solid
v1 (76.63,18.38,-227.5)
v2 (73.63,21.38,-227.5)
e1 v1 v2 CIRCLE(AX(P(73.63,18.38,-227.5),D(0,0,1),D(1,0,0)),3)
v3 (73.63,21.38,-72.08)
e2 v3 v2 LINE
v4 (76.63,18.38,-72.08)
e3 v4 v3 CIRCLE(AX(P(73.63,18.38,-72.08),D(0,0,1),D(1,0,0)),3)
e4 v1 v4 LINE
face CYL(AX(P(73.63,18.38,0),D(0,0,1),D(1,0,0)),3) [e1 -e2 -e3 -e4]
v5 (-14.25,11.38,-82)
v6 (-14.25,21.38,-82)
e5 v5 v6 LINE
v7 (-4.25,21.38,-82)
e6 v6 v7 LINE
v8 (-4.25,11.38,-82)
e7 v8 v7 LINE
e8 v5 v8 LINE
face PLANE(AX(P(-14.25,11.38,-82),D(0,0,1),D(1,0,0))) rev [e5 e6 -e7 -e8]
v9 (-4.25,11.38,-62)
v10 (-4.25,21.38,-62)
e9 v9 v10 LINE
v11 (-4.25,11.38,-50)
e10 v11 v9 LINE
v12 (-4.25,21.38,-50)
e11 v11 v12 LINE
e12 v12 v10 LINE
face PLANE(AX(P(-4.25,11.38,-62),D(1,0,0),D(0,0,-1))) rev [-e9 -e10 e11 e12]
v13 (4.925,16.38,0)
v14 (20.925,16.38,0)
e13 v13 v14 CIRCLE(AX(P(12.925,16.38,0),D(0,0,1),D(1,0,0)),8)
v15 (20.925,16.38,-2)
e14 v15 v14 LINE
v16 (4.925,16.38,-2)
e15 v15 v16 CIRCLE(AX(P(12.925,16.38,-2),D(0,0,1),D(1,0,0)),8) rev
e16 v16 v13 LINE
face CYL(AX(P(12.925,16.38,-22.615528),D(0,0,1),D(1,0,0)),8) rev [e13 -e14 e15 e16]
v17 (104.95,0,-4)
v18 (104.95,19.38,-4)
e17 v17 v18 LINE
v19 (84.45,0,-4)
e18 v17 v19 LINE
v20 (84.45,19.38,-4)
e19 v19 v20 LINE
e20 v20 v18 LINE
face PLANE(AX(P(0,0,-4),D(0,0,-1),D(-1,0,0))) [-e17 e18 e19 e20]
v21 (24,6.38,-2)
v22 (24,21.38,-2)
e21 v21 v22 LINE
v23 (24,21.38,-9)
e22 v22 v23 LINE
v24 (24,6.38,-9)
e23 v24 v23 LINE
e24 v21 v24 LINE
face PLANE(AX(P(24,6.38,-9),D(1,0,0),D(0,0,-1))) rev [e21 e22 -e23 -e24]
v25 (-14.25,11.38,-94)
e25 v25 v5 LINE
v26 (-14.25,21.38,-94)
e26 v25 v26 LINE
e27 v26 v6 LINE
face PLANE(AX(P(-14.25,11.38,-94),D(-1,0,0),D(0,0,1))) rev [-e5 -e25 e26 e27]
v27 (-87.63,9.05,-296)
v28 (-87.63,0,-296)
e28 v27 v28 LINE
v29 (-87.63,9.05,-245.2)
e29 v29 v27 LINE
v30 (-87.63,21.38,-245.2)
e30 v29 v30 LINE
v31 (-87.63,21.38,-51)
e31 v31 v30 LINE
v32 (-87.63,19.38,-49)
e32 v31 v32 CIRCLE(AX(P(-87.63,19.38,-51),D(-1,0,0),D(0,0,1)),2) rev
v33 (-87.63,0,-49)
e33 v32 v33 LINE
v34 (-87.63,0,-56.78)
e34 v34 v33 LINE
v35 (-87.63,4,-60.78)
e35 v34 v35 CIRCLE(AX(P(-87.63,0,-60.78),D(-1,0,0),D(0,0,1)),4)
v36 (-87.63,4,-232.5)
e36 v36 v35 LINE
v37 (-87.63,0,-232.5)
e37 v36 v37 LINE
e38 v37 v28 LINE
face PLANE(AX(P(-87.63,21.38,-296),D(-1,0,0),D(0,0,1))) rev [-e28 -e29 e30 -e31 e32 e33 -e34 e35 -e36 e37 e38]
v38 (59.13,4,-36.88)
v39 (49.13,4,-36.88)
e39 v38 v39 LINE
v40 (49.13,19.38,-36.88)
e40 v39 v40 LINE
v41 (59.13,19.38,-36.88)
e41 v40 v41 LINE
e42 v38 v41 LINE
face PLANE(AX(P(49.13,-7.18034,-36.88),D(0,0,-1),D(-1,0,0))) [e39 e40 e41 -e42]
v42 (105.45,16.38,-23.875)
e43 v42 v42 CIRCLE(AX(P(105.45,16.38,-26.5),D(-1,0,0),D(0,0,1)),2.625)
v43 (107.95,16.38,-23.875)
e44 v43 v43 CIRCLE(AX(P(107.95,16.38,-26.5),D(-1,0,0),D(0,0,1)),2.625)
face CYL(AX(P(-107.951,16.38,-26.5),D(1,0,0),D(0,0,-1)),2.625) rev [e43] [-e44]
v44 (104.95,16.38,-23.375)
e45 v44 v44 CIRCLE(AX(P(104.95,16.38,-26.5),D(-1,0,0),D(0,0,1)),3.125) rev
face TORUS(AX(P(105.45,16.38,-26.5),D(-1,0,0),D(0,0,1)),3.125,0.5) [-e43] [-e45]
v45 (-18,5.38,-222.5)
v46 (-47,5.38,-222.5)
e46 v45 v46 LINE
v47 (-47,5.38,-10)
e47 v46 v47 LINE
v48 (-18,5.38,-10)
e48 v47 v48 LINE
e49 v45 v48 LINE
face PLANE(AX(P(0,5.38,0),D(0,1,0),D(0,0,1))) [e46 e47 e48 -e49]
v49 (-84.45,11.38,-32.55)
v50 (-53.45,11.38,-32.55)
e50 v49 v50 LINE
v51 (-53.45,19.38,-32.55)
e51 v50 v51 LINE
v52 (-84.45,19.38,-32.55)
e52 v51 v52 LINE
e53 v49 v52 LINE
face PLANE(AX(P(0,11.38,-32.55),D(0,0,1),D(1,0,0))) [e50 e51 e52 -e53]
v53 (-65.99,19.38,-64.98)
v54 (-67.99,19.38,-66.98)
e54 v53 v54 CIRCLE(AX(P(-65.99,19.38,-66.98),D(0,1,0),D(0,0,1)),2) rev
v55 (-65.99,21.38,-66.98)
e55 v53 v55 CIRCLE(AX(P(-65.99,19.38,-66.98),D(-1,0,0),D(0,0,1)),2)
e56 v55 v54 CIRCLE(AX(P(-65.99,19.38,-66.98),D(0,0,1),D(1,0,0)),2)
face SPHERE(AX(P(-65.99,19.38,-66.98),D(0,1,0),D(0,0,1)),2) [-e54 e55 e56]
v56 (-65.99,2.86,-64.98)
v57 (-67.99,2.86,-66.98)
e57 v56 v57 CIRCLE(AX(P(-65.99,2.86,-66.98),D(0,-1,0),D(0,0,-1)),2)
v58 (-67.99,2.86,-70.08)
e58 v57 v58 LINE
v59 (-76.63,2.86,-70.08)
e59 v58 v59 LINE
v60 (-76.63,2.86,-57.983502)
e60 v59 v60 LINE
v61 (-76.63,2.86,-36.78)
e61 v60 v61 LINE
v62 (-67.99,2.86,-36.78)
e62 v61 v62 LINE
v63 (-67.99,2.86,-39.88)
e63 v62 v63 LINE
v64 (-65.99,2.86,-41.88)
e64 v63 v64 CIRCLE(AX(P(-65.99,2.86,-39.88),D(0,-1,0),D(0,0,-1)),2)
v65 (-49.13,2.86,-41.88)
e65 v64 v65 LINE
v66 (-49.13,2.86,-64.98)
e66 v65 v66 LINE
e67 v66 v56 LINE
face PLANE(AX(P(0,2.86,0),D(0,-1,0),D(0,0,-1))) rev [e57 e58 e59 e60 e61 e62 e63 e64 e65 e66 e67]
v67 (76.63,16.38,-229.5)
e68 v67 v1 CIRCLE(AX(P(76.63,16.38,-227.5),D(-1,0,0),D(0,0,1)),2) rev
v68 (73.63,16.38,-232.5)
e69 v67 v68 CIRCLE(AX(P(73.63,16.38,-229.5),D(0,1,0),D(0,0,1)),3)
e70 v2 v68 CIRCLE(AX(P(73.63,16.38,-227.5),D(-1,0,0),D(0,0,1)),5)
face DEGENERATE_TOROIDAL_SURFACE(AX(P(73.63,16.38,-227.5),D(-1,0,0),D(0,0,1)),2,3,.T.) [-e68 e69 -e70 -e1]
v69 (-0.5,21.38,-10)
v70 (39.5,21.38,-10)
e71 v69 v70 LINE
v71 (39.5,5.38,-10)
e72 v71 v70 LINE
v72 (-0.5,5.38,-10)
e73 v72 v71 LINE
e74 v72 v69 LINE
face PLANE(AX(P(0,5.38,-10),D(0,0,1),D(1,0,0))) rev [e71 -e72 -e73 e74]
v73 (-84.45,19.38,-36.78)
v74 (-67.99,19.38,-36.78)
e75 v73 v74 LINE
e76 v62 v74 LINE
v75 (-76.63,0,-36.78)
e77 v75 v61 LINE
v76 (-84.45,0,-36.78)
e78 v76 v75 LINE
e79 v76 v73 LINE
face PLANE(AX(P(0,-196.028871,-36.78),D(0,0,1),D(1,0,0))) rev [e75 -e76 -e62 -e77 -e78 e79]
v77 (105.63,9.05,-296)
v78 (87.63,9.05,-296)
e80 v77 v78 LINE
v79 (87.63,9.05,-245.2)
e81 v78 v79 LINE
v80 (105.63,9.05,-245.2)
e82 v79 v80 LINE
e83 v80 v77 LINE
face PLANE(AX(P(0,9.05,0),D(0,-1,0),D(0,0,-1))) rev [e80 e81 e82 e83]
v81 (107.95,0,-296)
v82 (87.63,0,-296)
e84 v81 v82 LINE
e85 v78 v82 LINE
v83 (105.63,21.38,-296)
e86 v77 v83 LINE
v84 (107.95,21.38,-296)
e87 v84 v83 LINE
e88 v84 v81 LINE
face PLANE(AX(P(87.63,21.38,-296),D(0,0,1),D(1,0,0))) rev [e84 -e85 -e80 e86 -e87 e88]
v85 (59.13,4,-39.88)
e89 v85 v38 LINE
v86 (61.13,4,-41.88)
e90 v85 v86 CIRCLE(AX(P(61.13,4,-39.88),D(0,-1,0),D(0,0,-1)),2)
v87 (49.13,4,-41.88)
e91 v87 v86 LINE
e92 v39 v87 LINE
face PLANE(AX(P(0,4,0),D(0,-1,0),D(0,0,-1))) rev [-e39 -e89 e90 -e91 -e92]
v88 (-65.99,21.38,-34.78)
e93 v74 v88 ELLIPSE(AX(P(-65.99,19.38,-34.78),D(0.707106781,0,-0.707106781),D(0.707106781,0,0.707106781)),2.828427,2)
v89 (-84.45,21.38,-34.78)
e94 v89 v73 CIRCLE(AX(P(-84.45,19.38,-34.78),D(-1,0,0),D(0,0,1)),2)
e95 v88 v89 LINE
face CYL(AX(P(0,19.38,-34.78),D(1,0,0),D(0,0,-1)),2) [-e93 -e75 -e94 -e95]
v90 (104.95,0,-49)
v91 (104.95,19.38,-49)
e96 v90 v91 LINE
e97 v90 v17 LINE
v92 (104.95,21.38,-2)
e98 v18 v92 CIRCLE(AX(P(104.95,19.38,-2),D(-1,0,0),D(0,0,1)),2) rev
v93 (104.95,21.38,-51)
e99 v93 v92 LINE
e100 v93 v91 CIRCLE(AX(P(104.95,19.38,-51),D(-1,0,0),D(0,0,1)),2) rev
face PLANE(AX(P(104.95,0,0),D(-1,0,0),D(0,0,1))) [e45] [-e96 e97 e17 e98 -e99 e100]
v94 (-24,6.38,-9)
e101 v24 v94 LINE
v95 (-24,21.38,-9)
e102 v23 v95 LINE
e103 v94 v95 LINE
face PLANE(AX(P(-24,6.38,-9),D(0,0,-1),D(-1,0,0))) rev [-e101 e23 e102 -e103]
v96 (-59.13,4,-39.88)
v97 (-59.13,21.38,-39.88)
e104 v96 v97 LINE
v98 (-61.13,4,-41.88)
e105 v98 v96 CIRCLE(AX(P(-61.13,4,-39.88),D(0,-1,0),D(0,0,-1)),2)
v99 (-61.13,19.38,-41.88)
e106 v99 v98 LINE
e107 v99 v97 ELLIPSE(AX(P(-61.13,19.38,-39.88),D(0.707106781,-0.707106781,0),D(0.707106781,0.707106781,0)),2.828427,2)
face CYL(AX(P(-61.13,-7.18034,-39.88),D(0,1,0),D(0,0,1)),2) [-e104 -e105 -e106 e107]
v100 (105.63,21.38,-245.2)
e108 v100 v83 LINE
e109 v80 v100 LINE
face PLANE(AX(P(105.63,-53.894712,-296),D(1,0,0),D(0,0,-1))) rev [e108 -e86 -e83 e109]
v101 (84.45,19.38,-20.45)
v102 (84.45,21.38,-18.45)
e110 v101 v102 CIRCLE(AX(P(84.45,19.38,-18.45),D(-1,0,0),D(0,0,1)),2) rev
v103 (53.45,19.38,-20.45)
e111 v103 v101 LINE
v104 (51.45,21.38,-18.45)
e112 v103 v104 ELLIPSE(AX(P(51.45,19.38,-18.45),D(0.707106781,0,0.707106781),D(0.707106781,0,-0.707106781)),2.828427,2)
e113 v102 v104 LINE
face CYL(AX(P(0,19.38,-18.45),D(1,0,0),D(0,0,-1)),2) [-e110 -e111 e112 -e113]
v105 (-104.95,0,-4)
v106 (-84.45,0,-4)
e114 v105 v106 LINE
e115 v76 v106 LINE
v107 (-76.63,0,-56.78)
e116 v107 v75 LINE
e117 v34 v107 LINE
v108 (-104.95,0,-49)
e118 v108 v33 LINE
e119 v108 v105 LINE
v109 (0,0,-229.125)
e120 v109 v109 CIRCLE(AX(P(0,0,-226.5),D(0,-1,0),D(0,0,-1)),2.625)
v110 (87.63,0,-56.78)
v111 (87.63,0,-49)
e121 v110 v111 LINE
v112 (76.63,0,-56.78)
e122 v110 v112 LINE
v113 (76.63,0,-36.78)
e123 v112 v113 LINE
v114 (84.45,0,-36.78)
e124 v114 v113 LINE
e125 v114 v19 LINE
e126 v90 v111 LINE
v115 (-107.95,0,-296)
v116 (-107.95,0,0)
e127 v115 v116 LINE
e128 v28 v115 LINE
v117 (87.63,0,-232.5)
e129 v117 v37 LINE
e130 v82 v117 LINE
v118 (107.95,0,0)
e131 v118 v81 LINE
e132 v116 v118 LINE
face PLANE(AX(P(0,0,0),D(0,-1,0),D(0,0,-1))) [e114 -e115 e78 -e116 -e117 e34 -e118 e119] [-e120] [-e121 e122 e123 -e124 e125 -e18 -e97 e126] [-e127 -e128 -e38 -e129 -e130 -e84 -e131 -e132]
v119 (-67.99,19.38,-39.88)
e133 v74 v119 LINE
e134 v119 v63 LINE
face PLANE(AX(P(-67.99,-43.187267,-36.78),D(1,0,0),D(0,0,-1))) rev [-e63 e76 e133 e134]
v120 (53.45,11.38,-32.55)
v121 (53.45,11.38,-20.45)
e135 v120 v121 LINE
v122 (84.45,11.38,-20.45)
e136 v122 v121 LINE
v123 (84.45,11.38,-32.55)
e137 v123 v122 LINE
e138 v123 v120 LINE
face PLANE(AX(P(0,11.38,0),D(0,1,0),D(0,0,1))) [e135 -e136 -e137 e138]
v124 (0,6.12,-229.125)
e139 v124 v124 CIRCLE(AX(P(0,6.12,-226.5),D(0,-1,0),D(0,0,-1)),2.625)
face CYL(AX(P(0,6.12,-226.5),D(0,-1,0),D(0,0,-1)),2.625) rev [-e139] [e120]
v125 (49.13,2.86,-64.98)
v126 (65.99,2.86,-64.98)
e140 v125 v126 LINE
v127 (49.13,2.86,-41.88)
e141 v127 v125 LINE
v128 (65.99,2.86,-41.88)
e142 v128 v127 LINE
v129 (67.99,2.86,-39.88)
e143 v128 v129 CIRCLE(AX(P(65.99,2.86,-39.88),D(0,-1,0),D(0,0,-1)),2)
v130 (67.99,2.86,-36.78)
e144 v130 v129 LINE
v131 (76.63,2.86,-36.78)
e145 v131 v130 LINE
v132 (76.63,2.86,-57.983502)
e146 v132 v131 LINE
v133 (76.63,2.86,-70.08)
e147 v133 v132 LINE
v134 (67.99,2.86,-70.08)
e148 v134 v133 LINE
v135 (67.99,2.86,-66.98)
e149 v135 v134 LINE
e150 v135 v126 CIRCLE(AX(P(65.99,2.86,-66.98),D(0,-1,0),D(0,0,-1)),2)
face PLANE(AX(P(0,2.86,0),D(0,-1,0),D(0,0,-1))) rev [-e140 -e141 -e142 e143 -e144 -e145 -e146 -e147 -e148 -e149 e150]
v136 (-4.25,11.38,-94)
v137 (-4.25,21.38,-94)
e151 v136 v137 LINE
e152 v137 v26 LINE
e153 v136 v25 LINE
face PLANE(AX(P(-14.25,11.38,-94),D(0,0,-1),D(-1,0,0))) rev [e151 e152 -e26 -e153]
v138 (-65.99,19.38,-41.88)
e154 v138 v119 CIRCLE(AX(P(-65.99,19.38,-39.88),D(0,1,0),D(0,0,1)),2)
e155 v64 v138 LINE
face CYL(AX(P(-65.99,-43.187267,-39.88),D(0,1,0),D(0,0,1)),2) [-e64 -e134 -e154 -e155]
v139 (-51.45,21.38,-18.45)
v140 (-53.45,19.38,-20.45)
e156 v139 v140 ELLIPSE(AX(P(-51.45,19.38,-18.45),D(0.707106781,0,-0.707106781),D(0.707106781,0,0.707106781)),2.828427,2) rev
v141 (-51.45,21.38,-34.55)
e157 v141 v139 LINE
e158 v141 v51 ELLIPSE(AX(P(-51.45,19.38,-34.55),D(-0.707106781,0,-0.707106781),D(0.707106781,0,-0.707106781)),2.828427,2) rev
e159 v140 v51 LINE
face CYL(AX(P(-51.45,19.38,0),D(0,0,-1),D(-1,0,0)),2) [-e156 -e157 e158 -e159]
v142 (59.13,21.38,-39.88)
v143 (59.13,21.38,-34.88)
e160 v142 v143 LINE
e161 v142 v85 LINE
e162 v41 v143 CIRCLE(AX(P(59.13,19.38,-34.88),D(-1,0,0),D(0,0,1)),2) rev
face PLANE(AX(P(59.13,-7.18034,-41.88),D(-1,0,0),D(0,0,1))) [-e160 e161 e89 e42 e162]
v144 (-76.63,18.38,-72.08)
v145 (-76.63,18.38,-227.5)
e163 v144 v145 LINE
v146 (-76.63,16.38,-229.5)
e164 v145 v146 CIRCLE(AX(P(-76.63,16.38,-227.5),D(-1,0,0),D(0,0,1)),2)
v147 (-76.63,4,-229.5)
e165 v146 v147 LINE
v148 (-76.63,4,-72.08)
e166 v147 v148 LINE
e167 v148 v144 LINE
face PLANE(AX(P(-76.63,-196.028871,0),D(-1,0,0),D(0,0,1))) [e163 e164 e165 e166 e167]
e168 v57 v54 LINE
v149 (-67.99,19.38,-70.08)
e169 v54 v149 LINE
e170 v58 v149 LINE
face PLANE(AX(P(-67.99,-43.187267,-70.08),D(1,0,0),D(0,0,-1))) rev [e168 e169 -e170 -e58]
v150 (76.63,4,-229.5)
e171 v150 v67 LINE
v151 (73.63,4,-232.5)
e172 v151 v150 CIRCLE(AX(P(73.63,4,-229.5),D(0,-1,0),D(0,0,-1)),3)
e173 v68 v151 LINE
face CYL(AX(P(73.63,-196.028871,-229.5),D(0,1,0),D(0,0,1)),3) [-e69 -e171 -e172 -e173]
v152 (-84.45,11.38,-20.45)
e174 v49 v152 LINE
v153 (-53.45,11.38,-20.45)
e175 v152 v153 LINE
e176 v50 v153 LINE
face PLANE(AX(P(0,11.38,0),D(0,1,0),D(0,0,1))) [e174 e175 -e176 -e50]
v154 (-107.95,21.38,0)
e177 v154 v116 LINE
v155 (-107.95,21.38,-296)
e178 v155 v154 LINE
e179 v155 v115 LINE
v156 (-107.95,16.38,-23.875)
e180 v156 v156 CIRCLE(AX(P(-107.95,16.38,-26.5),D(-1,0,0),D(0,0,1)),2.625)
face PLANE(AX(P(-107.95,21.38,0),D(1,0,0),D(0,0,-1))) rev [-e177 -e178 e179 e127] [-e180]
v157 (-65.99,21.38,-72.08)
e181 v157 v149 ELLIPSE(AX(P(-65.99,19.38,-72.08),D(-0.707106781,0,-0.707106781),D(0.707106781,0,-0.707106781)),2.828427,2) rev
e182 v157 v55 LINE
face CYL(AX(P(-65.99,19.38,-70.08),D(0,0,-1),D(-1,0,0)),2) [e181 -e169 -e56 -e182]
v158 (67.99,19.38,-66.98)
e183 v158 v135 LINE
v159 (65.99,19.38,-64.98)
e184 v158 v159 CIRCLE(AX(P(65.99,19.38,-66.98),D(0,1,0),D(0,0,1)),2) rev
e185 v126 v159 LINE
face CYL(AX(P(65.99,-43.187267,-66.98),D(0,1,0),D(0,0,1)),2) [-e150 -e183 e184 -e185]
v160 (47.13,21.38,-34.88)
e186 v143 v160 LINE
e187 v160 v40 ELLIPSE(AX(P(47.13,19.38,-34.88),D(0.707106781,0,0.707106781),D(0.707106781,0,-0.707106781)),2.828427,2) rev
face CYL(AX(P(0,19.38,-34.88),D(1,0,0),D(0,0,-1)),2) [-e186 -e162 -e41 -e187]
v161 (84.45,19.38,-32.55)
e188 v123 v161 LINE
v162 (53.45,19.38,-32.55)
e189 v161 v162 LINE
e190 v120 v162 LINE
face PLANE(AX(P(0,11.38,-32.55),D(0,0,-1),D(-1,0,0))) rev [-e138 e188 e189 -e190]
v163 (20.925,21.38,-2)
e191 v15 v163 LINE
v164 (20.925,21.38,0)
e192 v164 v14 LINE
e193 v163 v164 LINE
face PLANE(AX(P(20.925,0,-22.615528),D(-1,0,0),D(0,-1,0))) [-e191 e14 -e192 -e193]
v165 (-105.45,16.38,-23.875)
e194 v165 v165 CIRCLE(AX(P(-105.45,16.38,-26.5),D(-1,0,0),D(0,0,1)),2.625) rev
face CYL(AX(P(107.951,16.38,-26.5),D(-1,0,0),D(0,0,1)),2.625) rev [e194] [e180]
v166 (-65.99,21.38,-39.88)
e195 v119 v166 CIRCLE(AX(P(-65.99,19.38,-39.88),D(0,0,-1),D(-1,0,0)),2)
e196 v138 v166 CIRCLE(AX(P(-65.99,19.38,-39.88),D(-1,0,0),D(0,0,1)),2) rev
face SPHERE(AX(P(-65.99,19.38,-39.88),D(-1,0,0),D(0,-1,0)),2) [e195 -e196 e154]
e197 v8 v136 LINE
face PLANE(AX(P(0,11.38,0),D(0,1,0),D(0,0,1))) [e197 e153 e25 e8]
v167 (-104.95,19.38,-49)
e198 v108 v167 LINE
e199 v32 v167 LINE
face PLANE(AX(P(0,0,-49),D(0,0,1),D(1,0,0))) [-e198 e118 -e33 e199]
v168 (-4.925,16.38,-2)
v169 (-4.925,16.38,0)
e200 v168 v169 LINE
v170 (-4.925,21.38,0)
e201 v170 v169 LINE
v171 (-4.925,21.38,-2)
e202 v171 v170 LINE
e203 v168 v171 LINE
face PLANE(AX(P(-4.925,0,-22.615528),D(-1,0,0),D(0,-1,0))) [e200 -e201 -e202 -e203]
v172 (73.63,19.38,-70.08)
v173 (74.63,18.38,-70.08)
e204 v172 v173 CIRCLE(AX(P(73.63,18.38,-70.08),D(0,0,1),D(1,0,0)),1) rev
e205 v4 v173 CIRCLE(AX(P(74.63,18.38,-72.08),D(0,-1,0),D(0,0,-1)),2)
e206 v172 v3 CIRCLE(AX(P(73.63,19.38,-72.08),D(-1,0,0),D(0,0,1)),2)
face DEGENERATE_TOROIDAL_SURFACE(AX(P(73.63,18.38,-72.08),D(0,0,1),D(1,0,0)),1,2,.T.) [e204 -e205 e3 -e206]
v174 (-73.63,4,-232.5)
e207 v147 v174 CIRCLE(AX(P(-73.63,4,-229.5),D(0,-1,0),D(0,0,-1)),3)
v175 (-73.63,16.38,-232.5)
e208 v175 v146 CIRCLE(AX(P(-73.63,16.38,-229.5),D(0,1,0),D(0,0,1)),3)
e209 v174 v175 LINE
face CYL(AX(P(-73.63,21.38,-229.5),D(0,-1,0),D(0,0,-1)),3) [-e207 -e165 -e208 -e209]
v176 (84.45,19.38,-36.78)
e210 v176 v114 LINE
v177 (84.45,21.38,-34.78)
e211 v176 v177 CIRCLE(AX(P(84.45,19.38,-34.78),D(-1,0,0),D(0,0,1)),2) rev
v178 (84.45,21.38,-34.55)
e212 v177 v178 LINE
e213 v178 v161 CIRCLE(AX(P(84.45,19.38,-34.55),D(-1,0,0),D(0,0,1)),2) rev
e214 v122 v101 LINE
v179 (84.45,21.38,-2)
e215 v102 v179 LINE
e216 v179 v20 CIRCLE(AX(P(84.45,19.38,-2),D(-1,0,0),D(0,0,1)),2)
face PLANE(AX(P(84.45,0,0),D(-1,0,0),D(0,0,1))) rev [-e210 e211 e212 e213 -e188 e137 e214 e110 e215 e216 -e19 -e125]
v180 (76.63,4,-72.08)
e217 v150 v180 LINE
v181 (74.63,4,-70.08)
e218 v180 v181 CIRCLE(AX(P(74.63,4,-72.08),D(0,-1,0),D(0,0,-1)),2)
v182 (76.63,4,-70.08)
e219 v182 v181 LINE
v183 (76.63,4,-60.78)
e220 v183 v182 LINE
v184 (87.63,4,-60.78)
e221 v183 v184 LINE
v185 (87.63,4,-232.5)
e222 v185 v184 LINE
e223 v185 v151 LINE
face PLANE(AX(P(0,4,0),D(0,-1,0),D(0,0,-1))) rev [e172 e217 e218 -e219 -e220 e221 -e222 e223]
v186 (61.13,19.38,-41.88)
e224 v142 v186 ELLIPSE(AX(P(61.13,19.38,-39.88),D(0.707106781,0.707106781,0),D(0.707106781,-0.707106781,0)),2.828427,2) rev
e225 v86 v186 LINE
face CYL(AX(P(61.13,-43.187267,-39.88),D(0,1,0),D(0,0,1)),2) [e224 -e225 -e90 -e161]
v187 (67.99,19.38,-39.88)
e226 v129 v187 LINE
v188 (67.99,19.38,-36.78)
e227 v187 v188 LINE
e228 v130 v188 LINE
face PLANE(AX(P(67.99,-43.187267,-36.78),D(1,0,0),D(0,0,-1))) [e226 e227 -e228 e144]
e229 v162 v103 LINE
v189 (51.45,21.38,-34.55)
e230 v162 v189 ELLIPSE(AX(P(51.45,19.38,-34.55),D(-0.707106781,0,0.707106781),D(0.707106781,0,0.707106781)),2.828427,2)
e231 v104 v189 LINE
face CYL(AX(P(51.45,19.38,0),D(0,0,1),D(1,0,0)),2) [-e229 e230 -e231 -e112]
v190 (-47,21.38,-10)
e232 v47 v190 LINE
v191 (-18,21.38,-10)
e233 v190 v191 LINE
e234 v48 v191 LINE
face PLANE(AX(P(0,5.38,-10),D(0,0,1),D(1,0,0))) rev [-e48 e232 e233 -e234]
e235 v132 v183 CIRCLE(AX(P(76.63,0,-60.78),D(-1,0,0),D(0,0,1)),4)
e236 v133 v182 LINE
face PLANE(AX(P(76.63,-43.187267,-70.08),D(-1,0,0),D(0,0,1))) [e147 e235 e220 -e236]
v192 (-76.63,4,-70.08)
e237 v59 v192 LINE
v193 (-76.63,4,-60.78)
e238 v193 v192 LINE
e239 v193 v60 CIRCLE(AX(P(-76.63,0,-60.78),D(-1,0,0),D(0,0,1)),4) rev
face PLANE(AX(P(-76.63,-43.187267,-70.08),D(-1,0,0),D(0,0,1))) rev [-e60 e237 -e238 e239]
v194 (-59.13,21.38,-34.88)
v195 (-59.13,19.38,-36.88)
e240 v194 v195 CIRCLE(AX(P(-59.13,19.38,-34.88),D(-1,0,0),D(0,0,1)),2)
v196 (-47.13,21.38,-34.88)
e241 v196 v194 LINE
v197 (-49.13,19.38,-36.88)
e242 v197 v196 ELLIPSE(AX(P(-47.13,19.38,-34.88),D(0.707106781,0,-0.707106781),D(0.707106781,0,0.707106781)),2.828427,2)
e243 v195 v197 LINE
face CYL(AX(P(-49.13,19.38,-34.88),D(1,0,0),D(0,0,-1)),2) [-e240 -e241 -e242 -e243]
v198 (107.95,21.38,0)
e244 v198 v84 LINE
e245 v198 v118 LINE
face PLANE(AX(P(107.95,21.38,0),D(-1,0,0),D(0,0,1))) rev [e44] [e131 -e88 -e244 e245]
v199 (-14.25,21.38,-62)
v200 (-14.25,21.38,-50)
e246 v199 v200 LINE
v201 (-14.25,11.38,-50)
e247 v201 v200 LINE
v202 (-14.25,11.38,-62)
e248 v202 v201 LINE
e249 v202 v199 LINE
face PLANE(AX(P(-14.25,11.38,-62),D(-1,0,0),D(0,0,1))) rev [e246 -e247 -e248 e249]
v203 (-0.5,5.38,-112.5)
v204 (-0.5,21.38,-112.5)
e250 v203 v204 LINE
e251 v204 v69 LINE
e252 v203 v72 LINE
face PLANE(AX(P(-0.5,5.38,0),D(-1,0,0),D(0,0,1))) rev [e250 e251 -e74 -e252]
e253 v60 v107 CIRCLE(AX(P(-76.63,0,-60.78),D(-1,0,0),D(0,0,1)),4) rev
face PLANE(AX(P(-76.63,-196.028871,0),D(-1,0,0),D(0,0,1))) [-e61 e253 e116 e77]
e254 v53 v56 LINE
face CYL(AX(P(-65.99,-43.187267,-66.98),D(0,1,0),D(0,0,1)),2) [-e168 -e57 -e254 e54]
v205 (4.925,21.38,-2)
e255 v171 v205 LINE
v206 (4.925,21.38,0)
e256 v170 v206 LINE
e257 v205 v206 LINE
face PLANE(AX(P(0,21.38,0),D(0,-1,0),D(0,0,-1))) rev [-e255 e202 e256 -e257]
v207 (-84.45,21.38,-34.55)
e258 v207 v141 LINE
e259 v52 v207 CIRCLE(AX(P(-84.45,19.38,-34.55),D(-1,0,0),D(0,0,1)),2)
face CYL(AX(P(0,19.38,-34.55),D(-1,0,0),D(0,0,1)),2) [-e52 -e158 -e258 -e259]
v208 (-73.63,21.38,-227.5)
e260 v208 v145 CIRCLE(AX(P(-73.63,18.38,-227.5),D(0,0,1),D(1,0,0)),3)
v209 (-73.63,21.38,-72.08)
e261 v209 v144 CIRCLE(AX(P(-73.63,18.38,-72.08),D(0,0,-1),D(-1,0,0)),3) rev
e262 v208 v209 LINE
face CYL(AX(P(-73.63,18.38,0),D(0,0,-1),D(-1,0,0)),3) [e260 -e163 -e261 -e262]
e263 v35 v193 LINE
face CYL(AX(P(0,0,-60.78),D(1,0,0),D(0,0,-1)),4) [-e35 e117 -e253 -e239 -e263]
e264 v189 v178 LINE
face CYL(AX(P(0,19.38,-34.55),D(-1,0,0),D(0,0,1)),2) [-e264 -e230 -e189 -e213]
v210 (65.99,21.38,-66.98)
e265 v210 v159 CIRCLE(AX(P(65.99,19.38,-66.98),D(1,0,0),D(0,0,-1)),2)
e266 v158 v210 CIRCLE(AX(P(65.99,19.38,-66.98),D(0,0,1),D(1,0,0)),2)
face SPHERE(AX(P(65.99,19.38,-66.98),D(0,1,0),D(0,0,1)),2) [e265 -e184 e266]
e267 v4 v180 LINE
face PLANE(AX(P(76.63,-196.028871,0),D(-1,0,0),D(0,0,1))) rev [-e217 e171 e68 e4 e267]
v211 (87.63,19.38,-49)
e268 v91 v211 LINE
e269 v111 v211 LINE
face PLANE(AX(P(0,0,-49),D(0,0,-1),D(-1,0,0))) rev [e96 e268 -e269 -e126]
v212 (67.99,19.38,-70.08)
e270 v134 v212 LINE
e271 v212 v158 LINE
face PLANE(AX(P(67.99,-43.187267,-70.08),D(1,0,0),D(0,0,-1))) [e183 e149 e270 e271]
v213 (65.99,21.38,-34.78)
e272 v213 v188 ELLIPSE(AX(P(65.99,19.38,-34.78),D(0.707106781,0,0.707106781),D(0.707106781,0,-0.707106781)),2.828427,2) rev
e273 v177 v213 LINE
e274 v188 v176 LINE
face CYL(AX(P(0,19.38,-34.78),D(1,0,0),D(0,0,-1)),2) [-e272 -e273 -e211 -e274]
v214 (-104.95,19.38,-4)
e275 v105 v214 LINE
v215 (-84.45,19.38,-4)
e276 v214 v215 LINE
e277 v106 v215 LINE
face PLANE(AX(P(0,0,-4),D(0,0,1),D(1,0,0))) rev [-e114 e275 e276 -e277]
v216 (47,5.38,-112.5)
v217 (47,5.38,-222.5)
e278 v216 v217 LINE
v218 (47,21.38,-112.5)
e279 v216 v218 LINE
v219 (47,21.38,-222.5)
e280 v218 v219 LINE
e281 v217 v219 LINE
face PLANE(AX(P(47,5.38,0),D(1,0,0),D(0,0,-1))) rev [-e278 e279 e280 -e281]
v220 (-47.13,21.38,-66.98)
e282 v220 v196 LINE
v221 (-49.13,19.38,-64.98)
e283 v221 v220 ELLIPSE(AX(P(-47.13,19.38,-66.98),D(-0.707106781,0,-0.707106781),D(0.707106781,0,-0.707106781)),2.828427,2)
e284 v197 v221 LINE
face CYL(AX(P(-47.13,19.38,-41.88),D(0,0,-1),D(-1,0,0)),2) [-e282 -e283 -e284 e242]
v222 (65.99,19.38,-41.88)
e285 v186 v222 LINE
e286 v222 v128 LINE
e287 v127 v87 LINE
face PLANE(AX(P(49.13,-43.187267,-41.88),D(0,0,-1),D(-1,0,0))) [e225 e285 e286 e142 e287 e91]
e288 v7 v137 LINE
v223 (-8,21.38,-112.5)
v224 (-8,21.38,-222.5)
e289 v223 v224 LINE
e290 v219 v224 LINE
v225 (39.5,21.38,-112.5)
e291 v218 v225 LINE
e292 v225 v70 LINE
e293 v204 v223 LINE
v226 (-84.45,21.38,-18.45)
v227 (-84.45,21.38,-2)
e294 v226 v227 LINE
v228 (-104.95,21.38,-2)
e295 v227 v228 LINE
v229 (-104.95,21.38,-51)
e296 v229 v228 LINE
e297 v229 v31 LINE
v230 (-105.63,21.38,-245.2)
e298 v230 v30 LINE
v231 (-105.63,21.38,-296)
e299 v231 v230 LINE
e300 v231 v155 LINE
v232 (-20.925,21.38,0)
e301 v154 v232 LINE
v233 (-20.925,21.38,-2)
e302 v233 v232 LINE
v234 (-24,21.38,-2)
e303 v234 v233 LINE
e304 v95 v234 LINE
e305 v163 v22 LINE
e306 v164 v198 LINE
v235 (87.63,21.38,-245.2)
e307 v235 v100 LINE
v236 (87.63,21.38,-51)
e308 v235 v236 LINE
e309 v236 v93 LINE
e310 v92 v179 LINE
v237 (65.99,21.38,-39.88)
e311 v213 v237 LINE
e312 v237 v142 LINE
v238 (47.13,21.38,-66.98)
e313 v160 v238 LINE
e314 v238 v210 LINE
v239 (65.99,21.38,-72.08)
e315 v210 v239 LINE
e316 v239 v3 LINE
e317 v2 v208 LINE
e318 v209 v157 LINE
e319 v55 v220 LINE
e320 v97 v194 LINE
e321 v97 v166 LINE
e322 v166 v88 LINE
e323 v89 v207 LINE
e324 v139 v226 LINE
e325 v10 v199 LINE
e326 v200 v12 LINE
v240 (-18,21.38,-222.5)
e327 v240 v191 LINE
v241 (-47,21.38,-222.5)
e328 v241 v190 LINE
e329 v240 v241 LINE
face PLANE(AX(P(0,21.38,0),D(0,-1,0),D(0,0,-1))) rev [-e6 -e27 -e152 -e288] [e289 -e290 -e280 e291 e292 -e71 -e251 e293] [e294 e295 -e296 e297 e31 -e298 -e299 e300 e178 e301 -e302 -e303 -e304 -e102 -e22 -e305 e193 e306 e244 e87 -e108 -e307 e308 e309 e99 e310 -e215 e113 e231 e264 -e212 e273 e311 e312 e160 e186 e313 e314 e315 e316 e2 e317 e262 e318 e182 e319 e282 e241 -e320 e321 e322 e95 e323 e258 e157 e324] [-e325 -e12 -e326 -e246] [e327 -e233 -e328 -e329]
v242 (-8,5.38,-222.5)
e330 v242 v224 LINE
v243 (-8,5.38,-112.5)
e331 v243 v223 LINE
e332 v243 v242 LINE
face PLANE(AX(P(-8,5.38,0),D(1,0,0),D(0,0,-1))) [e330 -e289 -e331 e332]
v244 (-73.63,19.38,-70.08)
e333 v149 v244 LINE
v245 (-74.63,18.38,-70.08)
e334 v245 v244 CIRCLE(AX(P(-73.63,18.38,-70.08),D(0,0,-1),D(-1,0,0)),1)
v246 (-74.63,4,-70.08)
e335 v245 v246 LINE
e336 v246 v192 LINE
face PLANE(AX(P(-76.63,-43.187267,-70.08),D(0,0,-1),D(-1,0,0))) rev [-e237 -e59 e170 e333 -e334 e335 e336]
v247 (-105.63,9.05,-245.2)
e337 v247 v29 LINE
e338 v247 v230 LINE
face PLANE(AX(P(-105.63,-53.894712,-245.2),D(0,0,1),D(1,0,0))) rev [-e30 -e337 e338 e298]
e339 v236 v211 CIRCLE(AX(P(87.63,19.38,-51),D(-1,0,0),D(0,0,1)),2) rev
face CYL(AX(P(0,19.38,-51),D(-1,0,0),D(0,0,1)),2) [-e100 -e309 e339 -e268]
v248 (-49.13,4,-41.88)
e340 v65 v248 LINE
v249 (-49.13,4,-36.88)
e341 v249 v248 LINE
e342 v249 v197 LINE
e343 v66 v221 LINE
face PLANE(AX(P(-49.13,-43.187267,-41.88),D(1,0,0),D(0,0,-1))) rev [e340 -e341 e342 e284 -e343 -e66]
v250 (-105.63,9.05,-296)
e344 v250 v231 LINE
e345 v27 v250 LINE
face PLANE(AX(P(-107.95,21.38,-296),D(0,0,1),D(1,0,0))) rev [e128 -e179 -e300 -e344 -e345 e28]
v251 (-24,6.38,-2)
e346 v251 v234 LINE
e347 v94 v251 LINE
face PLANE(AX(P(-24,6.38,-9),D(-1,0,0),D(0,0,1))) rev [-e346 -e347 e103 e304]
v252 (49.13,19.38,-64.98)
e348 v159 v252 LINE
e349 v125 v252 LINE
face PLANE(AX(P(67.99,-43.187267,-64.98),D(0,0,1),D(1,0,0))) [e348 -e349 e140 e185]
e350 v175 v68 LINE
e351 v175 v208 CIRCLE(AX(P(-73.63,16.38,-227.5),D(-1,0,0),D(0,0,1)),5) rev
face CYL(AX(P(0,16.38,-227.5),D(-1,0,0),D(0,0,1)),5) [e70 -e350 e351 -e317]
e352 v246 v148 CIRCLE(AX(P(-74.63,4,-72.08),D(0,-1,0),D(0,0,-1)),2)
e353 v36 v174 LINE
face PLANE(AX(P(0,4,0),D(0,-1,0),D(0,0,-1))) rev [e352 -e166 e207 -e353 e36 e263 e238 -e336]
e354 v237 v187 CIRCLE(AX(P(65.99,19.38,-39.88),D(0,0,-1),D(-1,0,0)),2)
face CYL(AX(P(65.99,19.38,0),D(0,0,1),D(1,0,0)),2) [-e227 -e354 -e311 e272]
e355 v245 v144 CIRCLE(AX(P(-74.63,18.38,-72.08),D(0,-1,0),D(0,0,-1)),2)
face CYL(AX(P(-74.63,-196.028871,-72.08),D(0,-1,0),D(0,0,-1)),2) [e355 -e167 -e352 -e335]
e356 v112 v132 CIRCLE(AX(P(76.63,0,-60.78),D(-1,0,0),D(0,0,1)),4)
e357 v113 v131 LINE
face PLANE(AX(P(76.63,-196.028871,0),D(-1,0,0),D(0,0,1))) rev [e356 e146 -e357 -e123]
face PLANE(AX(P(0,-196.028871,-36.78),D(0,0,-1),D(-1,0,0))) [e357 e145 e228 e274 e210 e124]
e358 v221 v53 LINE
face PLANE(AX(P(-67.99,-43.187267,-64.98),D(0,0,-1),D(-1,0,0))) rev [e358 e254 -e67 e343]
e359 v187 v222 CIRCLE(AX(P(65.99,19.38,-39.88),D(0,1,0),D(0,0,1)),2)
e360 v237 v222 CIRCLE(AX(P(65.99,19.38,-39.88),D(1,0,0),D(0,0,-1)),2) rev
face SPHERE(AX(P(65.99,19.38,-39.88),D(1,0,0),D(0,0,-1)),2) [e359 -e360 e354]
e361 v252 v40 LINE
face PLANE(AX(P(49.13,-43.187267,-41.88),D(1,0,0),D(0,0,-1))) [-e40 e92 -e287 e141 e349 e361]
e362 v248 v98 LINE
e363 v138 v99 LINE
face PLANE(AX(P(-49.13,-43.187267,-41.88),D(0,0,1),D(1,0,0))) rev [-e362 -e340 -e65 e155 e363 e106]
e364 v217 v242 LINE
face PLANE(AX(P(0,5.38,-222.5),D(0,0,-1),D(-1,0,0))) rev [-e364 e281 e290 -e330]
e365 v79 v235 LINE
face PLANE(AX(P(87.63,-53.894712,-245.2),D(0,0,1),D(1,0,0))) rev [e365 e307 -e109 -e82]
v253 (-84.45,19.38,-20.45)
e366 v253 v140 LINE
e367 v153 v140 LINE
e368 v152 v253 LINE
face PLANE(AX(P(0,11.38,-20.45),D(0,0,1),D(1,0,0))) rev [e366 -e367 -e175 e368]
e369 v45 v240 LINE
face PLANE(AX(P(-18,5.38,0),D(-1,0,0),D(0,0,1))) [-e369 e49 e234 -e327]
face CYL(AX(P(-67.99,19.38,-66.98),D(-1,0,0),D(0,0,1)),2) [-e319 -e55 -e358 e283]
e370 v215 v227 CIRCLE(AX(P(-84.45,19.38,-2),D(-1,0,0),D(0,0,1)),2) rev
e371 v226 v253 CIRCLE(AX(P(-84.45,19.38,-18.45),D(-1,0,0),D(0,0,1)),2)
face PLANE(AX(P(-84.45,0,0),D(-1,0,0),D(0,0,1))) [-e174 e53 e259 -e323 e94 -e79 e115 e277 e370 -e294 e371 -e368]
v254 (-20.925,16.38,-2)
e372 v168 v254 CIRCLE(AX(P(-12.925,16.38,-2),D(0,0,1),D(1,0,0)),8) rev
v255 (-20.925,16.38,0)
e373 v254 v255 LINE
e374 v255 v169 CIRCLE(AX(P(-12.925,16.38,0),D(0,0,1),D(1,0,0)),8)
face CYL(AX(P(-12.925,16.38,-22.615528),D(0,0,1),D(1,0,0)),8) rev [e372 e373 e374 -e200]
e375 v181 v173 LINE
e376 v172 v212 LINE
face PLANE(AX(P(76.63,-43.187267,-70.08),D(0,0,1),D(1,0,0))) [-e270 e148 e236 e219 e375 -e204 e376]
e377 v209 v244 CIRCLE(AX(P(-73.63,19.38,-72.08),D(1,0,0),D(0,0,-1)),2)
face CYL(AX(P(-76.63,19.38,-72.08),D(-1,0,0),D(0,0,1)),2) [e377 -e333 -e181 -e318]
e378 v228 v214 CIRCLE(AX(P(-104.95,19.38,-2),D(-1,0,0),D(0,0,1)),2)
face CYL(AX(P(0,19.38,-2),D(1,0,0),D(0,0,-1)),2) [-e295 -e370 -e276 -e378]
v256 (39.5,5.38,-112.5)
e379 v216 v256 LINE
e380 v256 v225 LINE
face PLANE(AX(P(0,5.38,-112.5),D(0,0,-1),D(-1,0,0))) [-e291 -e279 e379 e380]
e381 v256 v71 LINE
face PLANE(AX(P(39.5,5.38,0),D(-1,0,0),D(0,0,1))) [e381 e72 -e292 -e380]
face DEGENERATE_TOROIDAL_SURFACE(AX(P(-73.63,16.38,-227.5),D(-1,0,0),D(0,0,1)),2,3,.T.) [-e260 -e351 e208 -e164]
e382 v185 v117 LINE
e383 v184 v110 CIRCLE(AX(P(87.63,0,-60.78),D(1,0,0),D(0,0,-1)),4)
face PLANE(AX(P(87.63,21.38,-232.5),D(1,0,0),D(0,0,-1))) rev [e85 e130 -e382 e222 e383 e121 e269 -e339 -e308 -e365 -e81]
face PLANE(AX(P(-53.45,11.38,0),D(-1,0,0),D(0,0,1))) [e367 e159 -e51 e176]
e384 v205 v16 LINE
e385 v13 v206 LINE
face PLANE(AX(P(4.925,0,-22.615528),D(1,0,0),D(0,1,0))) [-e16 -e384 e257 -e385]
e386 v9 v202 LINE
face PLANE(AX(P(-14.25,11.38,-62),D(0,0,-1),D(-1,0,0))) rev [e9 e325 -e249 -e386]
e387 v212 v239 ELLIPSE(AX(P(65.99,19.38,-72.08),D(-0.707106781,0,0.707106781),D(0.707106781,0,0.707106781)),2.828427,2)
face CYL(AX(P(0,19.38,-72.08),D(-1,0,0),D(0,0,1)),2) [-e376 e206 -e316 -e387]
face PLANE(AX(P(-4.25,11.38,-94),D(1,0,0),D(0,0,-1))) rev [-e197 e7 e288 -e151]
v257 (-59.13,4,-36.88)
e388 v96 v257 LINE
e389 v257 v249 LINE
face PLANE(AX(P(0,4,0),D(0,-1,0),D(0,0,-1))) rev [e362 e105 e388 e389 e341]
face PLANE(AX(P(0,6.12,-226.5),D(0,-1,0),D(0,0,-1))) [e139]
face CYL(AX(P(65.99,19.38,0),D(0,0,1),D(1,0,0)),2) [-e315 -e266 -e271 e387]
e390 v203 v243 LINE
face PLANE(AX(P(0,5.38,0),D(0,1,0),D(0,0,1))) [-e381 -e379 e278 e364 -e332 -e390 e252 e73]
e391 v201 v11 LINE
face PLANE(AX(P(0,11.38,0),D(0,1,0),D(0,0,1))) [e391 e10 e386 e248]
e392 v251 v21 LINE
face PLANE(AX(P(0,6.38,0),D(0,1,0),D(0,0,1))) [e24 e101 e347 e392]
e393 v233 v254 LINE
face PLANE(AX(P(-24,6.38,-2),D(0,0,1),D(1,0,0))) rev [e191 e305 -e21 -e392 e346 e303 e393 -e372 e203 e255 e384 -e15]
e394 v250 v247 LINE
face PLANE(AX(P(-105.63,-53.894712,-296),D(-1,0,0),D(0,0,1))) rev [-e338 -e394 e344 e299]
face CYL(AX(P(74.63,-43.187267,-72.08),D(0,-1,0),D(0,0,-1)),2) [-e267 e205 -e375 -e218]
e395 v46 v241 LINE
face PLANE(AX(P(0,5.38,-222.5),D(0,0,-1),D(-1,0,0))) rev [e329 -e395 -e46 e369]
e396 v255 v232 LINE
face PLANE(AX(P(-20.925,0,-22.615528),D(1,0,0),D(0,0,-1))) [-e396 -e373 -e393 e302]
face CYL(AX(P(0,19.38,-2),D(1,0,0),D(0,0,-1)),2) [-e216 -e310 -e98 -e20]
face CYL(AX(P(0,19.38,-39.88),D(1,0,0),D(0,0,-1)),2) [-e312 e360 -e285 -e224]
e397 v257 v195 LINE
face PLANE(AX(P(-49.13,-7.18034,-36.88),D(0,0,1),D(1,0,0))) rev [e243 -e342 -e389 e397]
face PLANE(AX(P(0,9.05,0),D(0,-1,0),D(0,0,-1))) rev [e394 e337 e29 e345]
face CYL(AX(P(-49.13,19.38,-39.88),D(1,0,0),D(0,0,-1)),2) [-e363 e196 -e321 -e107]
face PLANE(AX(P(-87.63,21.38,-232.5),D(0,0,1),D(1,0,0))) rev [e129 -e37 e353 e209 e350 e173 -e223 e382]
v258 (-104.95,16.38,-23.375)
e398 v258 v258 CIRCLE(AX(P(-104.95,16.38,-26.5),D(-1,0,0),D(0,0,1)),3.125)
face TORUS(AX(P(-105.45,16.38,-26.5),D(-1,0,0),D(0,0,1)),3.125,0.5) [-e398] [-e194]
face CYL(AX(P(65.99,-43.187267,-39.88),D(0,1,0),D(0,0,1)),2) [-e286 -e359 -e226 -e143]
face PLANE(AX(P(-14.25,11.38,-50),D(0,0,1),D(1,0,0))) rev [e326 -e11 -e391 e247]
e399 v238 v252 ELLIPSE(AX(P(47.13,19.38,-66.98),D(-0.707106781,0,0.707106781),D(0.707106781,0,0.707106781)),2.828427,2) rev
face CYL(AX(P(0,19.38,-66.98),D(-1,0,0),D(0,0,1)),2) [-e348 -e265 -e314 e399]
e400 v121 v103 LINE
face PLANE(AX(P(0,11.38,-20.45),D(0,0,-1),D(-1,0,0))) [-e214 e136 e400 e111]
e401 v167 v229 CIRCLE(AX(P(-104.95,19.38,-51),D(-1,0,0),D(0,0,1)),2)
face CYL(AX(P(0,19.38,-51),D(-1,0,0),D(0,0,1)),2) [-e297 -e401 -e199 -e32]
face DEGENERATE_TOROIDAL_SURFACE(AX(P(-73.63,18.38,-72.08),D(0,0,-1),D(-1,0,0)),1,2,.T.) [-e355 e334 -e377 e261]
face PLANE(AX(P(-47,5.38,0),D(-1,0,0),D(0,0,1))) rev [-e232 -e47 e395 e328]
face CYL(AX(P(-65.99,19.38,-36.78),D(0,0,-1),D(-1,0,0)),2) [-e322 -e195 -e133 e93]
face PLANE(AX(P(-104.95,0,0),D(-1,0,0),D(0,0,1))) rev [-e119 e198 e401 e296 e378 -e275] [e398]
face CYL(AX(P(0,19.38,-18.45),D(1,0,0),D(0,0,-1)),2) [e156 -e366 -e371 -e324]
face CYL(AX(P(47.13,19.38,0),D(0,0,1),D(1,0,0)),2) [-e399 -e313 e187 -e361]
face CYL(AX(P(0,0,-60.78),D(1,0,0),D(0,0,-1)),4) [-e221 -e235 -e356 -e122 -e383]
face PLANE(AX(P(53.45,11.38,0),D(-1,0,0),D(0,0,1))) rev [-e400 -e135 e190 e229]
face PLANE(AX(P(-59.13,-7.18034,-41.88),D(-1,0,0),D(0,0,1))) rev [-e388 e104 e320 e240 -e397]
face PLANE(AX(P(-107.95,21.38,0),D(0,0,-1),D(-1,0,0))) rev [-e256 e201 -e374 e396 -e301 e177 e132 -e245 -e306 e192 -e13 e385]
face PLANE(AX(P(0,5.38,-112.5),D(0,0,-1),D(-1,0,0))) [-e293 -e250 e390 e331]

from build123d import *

# Parameters (mm, degrees)
BOSS_EXTRUDE1_DEPTH  = 21.38
FILLET9_R            = 5
CUT_EXTRUDE1_DEPTH   = 316.794722723
SKETCH2_4_W          = 31
SKETCH2_4_H          = 12.1
CUT_EXTRUDE2_DEPTH   = 10
CUT_EXTRUDE11_REACH  = 368.996
SKETCH8_R            = 2.625
FILLET8_R            = 0.5
FILLET2_R            = 2
SKETCH4_R            = 2.625
CUT_EXTRUDE4_DEPTH   = 6.12
SKETCH5_W            = 11
SKETCH5_H            = 175.72
SKETCH5_H_2          = 20
CUT_EXTRUDE5_DEPTH   = 17.38
CUT_EXTRUDE6_DEPTH   = 316.794722723
CUT_EXTRUDE7_DEPTH   = 18.52
SKETCH7_W            = 10
SKETCH7_H            = 5
CUT_EXTRUDE8_DEPTH   = 17.38
FILLET5_R            = 4
FILLET6_R            = 2
FILLET7_R            = 3
FILLET8_OF_MIRROR2_R = 0.5
FILLET2_OF_MIRROR2_R = 2
FILLET5_OF_MIRROR2_R = 4
FILLET6_OF_MIRROR2_R = 2
FILLET7_OF_MIRROR2_R = 3
SKETCH9_W            = 18
SKETCH9_H            = 50.8
CUT_EXTRUDE12_DEPTH  = 12.33
SKETCH10_W           = 29
SKETCH10_H           = 112.5
SKETCH10_H_2         = 50
SKETCH10_W_2         = 40
SKETCH10_H_3         = 102.5
SKETCH10_W_3         = 55
CUT_EXTRUDE13_DEPTH  = 16
SKETCH11_W           = 48
SKETCH11_H           = 7
CUT_EXTRUDE14_DEPTH  = 15
CUT_EXTRUDE15_DEPTH  = 2
SKETCH13_W           = 10
SKETCH13_H           = 12
CUT_EXTRUDE16_DEPTH  = 10


with BuildPart() as part:
    # Sketch1 → Boss-Extrude1 (new body)
    with BuildSketch(Plane(origin=(0, 0, 0), x_dir=(1, 0, 0), z_dir=(0, 1, 0))):
        Polygon((-87.63, 296), (-87.63, 232.5), (87.63, 232.5), (87.63, 296), (107.95, 296), (107.95, 0), (-107.95, 0), (-107.95, 296), align=None)
    extrude(amount=BOSS_EXTRUDE1_DEPTH)

    # Fillet9
    fillet9_edges = [part.edges().sort_by_distance(p)[0] for p in [
        (0, 21.38, -232.5),
    ]]
    fillet(fillet9_edges, radius=FILLET9_R)

    # Sketch2 → Cut-Extrude1 (cut, through all)
    with BuildSketch(Plane(origin=(0, 21.38, 0), x_dir=(1, 0, 0), z_dir=(0, 1, 0))):
        Polygon((-84.45, 20.45), (-84.45, 32.55), (-84.45, 49), (-104.95, 49), (-104.95, 29.25), (-104.95, 23.75), (-104.95, 4), (-84.45, 4), align=None)
    cut_extrude1 = extrude(amount=-CUT_EXTRUDE1_DEPTH, mode=Mode.SUBTRACT)

    # Sketch2<4> → Cut-Extrude2 (cut)
    with BuildSketch(Plane(origin=(0, 21.38, 0), x_dir=(1, 0, 0), z_dir=(0, 1, 0))):
        with Locations((-68.95, 26.5)):
            Rectangle(SKETCH2_4_W, SKETCH2_4_H)
    cut_extrude2 = extrude(amount=-CUT_EXTRUDE2_DEPTH, mode=Mode.SUBTRACT)

    # Sketch8 → Cut-Extrude11 (cut, up to next)
    with BuildSketch(Plane.ZY.offset(107.95), mode=Mode.PRIVATE) as cut_extrude11_sk1:
        with Locations((-26.5, 16.38)):
            Circle(SKETCH8_R)
    cut_extrude11_tool1 = extrude(cut_extrude11_sk1.sketch, amount=-CUT_EXTRUDE11_REACH, mode=Mode.PRIVATE) & part.part
    cut_extrude11 = cut_extrude11_tool1.solids().sort_by_distance((-107.95, 16.38, -26.5))[0]
    add(cut_extrude11, mode=Mode.SUBTRACT)

    # Fillet8
    fillet8_edges = [part.edges().sort_by_distance(p)[0] for p in [
        (-104.95, 16.38, -29.125),
    ]]
    fillet(fillet8_edges, radius=FILLET8_R)

    # Fillet2
    fillet2_edges = [part.edges().sort_by_distance(p)[0] for p in [
        (-94.7, 21.38, -49),
        (-94.7, 21.38, -4),
        (-53.45, 21.38, -26.5),
        (-68.95, 21.38, -32.55),
        (-68.95, 21.38, -20.45),
    ]]
    fillet(fillet2_edges, radius=FILLET2_R)

    # Sketch4 → Cut-Extrude4 (cut)
    with BuildSketch(Plane.XZ):
        with Locations(Location((0, -226.5, 0), (0, 0, 270))):
            Circle(SKETCH4_R)
    extrude(amount=-CUT_EXTRUDE4_DEPTH, mode=Mode.SUBTRACT)

    # Sketch5 → Cut-Extrude5 (cut)
    with BuildSketch(Plane(origin=(0, 21.38, 0), x_dir=(1, 0, 0), z_dir=(0, 1, 0))):
        with Locations((-82.13, 144.64)):
            Rectangle(SKETCH5_W, SKETCH5_H)
        with Locations((-82.13, 46.78)):
            Rectangle(SKETCH5_W, SKETCH5_H_2)
    cut_extrude5 = extrude(amount=-CUT_EXTRUDE5_DEPTH, mode=Mode.SUBTRACT)

    # Sketch5<3> → Cut-Extrude6 (cut, through all)
    with BuildSketch(Plane(origin=(0, 21.38, 0), x_dir=(1, 0, 0), z_dir=(0, 1, 0))):
        Polygon((-76.63, 56.78), (-87.63, 56.78), (-87.63, 51), (-87.63, 36.78), (-84.45, 36.78), (-76.63, 36.78), align=None)
    cut_extrude6 = extrude(amount=-CUT_EXTRUDE6_DEPTH, mode=Mode.SUBTRACT)

    # Sketch6 → Cut-Extrude7 (cut)
    with BuildSketch(Plane(origin=(0, 21.38, 0), x_dir=(1, 0, 0), z_dir=(0, 1, 0))):
        Polygon((-76.63, 36.78), (-67.99, 36.78), (-67.99, 41.88), (-49.13, 41.88), (-49.13, 64.98), (-67.99, 64.98), (-67.99, 70.08), (-76.63, 70.08), (-76.63, 64.98), align=None)
    cut_extrude7 = extrude(amount=-CUT_EXTRUDE7_DEPTH, mode=Mode.SUBTRACT)

    # Sketch7 → Cut-Extrude8 (cut)
    with BuildSketch(Plane(origin=(0, 21.38, 0), x_dir=(1, 0, 0), z_dir=(0, 1, 0))):
        with Locations((-54.13, 39.38)):
            Rectangle(SKETCH7_W, SKETCH7_H)
    cut_extrude8 = extrude(amount=-CUT_EXTRUDE8_DEPTH, mode=Mode.SUBTRACT)

    # Fillet5
    # the kernel refuses this fillet: 4 mm, written as the material it takes off along each edge
    with BuildSketch(Plane(origin=(-76.63, 4, -56.78), x_dir=(0, -1, 0), z_dir=(-1, 0, 0))) as fillet5_piece_1:
        with BuildLine():
            CenterArc((FILLET5_R, -FILLET5_R), FILLET5_R, 90, 90)
            Line((0, -FILLET5_R), (0, 0))
            Line((0, 0), (FILLET5_R, 0))
        make_face()
    extrude(amount=11, mode=Mode.SUBTRACT)

    # Fillet6
    fillet6_edges = [part.edges().sort_by_distance(p)[0] for p in [
        (-76.22, 21.38, -36.78),
        (-67.99, 21.38, -39.33),
        (-63.56, 21.38, -41.88),
        (-49.13, 21.38, -50.93),
        (-58.56, 21.38, -64.98),
        (-67.99, 21.38, -67.53),
        (-72.31, 21.38, -70.08),
        (-67.99, 12.12, -41.88),
        (-67.99, 12.12, -64.98),
        (-76.63, 12.69, -70.08),
        (-54.13, 21.38, -36.88),
        (-59.13, 12.69, -41.88),
    ]]
    fillet(fillet6_edges, radius=FILLET6_R)

    # Fillet7
    # the kernel refuses this fillet: 3 mm, written as the material it takes off along each edge
    with BuildSketch(Plane(origin=(-73.63, 18.38, -70.08), x_dir=(0, 1, 0), z_dir=(1, 0, 0))) as fillet7_piece_1:
        with BuildLine():
            CenterArc((1, -2), 2, 0, 90)
            Line((3, -2), (3, 0))
            Line((3, 0), (1, 0))
        make_face()
    revolve(axis=Axis((-73.63, 18.38, -70.08), (0, 0, 1)), revolution_arc=90, mode=Mode.SUBTRACT)
    with BuildSketch(Plane(origin=(-76.63, 16.38, -227.5), x_dir=(0, 0, -1), z_dir=(0, -1, 0))) as fillet7_piece_2:
        with BuildLine():
            CenterArc((5 - FILLET7_R, FILLET7_R), FILLET7_R, 270, 90)
            Line((5 - FILLET7_R, 0), (5, 0))
            Line((5, 0), (5, FILLET7_R))
        make_face()
    revolve(axis=Axis((-76.63, 16.38, -227.5), (1, 0, 0)), revolution_arc=90, mode=Mode.SUBTRACT)
    with BuildSketch(Plane(origin=(-76.63, 16.38, -232.5), x_dir=(1, 0, 0), z_dir=(0, -1, 0))) as fillet7_piece_3:
        with BuildLine():
            CenterArc((FILLET7_R, FILLET7_R), FILLET7_R, 180, 90)
            Line((0, FILLET7_R), (0, 0))
            Line((0, 0), (FILLET7_R, 0))
        make_face()
    extrude(amount=12.38, mode=Mode.SUBTRACT)
    with BuildSketch(Plane(origin=(-76.63, 21.38, -227.5), x_dir=(1, 0, 0), z_dir=(0, 0, 1))) as fillet7_piece_4:
        with BuildLine():
            CenterArc((FILLET7_R, -FILLET7_R), FILLET7_R, 90, 90)
            Line((0, -FILLET7_R), (0, 0))
            Line((0, 0), (FILLET7_R, 0))
        make_face()
    extrude(amount=157.42, mode=Mode.SUBTRACT)

    # Mirror2: Cut-Extrude1, Cut-Extrude2, Cut-Extrude11, Cut-Extrude5, Cut-Extrude6, Cut-Extrude7, Cut-Extrude8 across plane
    add(cut_extrude1.mirror(Plane(origin=(0, 0, 0), x_dir=(0, 0, 1), z_dir=(1, 0, 0))), mode=Mode.SUBTRACT)
    add(cut_extrude2.mirror(Plane(origin=(0, 0, 0), x_dir=(0, 0, 1), z_dir=(1, 0, 0))), mode=Mode.SUBTRACT)
    add(cut_extrude11.mirror(Plane(origin=(0, 0, 0), x_dir=(0, 0, 1), z_dir=(1, 0, 0))), mode=Mode.SUBTRACT)
    add(cut_extrude5.mirror(Plane(origin=(0, 0, 0), x_dir=(0, 0, 1), z_dir=(1, 0, 0))), mode=Mode.SUBTRACT)
    add(cut_extrude6.mirror(Plane(origin=(0, 0, 0), x_dir=(0, 0, 1), z_dir=(1, 0, 0))), mode=Mode.SUBTRACT)
    add(cut_extrude7.mirror(Plane(origin=(0, 0, 0), x_dir=(0, 0, 1), z_dir=(1, 0, 0))), mode=Mode.SUBTRACT)
    add(cut_extrude8.mirror(Plane(origin=(0, 0, 0), x_dir=(0, 0, 1), z_dir=(1, 0, 0))), mode=Mode.SUBTRACT)

    # Fillet8 of Mirror2
    fillet8_of_mirror2_edges = [part.edges().sort_by_distance(p)[0] for p in [
        (104.95, 16.38, -29.125),
    ]]
    fillet(fillet8_of_mirror2_edges, radius=FILLET8_OF_MIRROR2_R)

    # Fillet2 of Mirror2
    fillet2_of_mirror2_edges = [part.edges().sort_by_distance(p)[0] for p in [
        (94.7, 21.38, -49),
        (94.7, 21.38, -4),
        (53.45, 21.38, -26.5),
        (68.95, 21.38, -32.55),
        (68.95, 21.38, -20.45),
    ]]
    fillet(fillet2_of_mirror2_edges, radius=FILLET2_OF_MIRROR2_R)

    # Fillet5 of Mirror2
    # the kernel refuses this fillet: 4 mm, written as the material it takes off along each edge
    with BuildSketch(Plane(origin=(87.63, 4, -56.78), x_dir=(0, -1, 0), z_dir=(-1, 0, 0))) as fillet5_of_mirror2_piece_1:
        with BuildLine():
            CenterArc((FILLET5_OF_MIRROR2_R, -FILLET5_OF_MIRROR2_R), FILLET5_OF_MIRROR2_R, 90, 90)
            Line((0, -FILLET5_OF_MIRROR2_R), (0, 0))
            Line((0, 0), (FILLET5_OF_MIRROR2_R, 0))
        make_face()
    extrude(amount=11, mode=Mode.SUBTRACT)

    # Fillet6 of Mirror2
    fillet6_of_mirror2_edges = [part.edges().sort_by_distance(p)[0] for p in [
        (76.22, 21.38, -36.78),
        (67.99, 21.38, -39.33),
        (63.56, 21.38, -41.88),
        (49.13, 21.38, -50.93),
        (58.56, 21.38, -64.98),
        (67.99, 21.38, -67.53),
        (72.31, 21.38, -70.08),
        (67.99, 12.12, -41.88),
        (67.99, 12.12, -64.98),
        (76.63, 12.69, -70.08),
        (54.13, 21.38, -36.88),
        (59.13, 12.69, -41.88),
    ]]
    fillet(fillet6_of_mirror2_edges, radius=FILLET6_OF_MIRROR2_R)

    # Fillet7 of Mirror2
    # the kernel refuses this fillet: 3 mm, written as the material it takes off along each edge
    with BuildSketch(Plane(origin=(73.63, 18.38, -70.08), x_dir=(1, 0, 0), z_dir=(0, -1, 0))) as fillet7_of_mirror2_piece_1:
        with BuildLine():
            CenterArc((1, -2), 2, 0, 90)
            Line((3, -2), (3, 0))
            Line((3, 0), (1, 0))
        make_face()
    revolve(axis=Axis((73.63, 18.38, -70.08), (0, 0, 1)), revolution_arc=90, mode=Mode.SUBTRACT)
    with BuildSketch(Plane(origin=(76.63, 16.38, -227.5), x_dir=(0, 0, -1), z_dir=(0, -1, 0))) as fillet7_of_mirror2_piece_2:
        with BuildLine():
            CenterArc((5 - FILLET7_OF_MIRROR2_R, -FILLET7_OF_MIRROR2_R), FILLET7_OF_MIRROR2_R, 0, 90)
            Line((5, -FILLET7_OF_MIRROR2_R), (5, 0))
            Line((5, 0), (5 - FILLET7_OF_MIRROR2_R, 0))
        make_face()
    revolve(axis=Axis((76.63, 16.38, -227.5), (1, 0, 0)), revolution_arc=90, mode=Mode.SUBTRACT)
    with BuildSketch(Plane(origin=(76.63, 16.38, -232.5), x_dir=(0, 0, 1), z_dir=(0, -1, 0))) as fillet7_of_mirror2_piece_3:
        with BuildLine():
            CenterArc((FILLET7_OF_MIRROR2_R, FILLET7_OF_MIRROR2_R), FILLET7_OF_MIRROR2_R, 180, 90)
            Line((0, FILLET7_OF_MIRROR2_R), (0, 0))
            Line((0, 0), (FILLET7_OF_MIRROR2_R, 0))
        make_face()
    extrude(amount=12.38, mode=Mode.SUBTRACT)
    with BuildSketch(Plane(origin=(76.63, 21.38, -70.08), x_dir=(0, -1, 0), z_dir=(0, 0, -1))) as fillet7_of_mirror2_piece_4:
        with BuildLine():
            CenterArc((FILLET7_OF_MIRROR2_R, FILLET7_OF_MIRROR2_R), FILLET7_OF_MIRROR2_R, 180, 90)
            Line((0, FILLET7_OF_MIRROR2_R), (0, 0))
            Line((0, 0), (FILLET7_OF_MIRROR2_R, 0))
        make_face()
    extrude(amount=157.42, mode=Mode.SUBTRACT)

    # Sketch9 → Cut-Extrude12 (cut)
    with BuildSketch(Plane(origin=(0, 21.38, 0), x_dir=(1, 0, 0), z_dir=(0, 1, 0))):
        with Locations((-96.63, 270.6)):
            Rectangle(SKETCH9_W, SKETCH9_H)
        with Locations((96.63, 270.6)):
            Rectangle(SKETCH9_W, SKETCH9_H)
    extrude(amount=-CUT_EXTRUDE12_DEPTH, mode=Mode.SUBTRACT)

    # Sketch10 → Cut-Extrude13 (cut)
    with BuildSketch(Plane(origin=(0, 21.38, 0), x_dir=(1, 0, 0), z_dir=(0, 1, 0))):
        with Locations((-32.5, 66.25)):
            Rectangle(SKETCH10_W, SKETCH10_H)
        with Locations((-32.5, 147.5)):
            Rectangle(SKETCH10_W, SKETCH10_H_2)
        with Locations((19.5, 61.25)):
            Rectangle(SKETCH10_W_2, SKETCH10_H_3)
        Polygon((47, 172.5), (-8, 172.5), (-8, 112.5), (-0.5, 112.5), (39.5, 112.5), (47, 112.5), align=None)
        with Locations((-32.5, 197.5)):
            Rectangle(SKETCH10_W, SKETCH10_H_2)
        with Locations((19.5, 197.5)):
            Rectangle(SKETCH10_W_3, SKETCH10_H_2)
    extrude(amount=-CUT_EXTRUDE13_DEPTH, mode=Mode.SUBTRACT)

    # Sketch11 → Cut-Extrude14 (cut)
    with BuildSketch(Plane(origin=(0, 21.38, 0), x_dir=(1, 0, 0), z_dir=(0, 1, 0))):
        with Locations((0, 5.5)):
            Rectangle(SKETCH11_W, SKETCH11_H)
    extrude(amount=-CUT_EXTRUDE14_DEPTH, mode=Mode.SUBTRACT)

    # Sketch12 → Cut-Extrude15 (cut)
    with BuildSketch(Plane.XY):
        with BuildLine():
            Line((-20.925, 21.38), (-20.925, 16.38))
            ThreePointArc((-20.925, 16.38), (-12.925, 8.38), (-4.925, 16.38))
            Line((-4.925, 16.38), (-4.925, 21.38))
            Line((-4.925, 21.38), (-20.925, 21.38))
        make_face()
        with BuildLine():
            Line((20.925, 21.38), (4.925, 21.38))
            Line((4.925, 21.38), (4.925, 16.38))
            ThreePointArc((4.925, 16.38), (12.925, 8.38), (20.925, 16.38))
            Line((20.925, 16.38), (20.925, 21.38))
        make_face()
    extrude(amount=-CUT_EXTRUDE15_DEPTH, mode=Mode.SUBTRACT)

    # Sketch13 → Cut-Extrude16 (cut)
    with BuildSketch(Plane(origin=(0, 21.38, 0), x_dir=(1, 0, 0), z_dir=(0, 1, 0))):
        with Locations((-9.25, 88)):
            Rectangle(SKETCH13_W, SKETCH13_H)
        with Locations((-9.25, 56)):
            Rectangle(SKETCH13_W, SKETCH13_H)
    extrude(amount=-CUT_EXTRUDE16_DEPTH, mode=Mode.SUBTRACT)


solid = part.part
